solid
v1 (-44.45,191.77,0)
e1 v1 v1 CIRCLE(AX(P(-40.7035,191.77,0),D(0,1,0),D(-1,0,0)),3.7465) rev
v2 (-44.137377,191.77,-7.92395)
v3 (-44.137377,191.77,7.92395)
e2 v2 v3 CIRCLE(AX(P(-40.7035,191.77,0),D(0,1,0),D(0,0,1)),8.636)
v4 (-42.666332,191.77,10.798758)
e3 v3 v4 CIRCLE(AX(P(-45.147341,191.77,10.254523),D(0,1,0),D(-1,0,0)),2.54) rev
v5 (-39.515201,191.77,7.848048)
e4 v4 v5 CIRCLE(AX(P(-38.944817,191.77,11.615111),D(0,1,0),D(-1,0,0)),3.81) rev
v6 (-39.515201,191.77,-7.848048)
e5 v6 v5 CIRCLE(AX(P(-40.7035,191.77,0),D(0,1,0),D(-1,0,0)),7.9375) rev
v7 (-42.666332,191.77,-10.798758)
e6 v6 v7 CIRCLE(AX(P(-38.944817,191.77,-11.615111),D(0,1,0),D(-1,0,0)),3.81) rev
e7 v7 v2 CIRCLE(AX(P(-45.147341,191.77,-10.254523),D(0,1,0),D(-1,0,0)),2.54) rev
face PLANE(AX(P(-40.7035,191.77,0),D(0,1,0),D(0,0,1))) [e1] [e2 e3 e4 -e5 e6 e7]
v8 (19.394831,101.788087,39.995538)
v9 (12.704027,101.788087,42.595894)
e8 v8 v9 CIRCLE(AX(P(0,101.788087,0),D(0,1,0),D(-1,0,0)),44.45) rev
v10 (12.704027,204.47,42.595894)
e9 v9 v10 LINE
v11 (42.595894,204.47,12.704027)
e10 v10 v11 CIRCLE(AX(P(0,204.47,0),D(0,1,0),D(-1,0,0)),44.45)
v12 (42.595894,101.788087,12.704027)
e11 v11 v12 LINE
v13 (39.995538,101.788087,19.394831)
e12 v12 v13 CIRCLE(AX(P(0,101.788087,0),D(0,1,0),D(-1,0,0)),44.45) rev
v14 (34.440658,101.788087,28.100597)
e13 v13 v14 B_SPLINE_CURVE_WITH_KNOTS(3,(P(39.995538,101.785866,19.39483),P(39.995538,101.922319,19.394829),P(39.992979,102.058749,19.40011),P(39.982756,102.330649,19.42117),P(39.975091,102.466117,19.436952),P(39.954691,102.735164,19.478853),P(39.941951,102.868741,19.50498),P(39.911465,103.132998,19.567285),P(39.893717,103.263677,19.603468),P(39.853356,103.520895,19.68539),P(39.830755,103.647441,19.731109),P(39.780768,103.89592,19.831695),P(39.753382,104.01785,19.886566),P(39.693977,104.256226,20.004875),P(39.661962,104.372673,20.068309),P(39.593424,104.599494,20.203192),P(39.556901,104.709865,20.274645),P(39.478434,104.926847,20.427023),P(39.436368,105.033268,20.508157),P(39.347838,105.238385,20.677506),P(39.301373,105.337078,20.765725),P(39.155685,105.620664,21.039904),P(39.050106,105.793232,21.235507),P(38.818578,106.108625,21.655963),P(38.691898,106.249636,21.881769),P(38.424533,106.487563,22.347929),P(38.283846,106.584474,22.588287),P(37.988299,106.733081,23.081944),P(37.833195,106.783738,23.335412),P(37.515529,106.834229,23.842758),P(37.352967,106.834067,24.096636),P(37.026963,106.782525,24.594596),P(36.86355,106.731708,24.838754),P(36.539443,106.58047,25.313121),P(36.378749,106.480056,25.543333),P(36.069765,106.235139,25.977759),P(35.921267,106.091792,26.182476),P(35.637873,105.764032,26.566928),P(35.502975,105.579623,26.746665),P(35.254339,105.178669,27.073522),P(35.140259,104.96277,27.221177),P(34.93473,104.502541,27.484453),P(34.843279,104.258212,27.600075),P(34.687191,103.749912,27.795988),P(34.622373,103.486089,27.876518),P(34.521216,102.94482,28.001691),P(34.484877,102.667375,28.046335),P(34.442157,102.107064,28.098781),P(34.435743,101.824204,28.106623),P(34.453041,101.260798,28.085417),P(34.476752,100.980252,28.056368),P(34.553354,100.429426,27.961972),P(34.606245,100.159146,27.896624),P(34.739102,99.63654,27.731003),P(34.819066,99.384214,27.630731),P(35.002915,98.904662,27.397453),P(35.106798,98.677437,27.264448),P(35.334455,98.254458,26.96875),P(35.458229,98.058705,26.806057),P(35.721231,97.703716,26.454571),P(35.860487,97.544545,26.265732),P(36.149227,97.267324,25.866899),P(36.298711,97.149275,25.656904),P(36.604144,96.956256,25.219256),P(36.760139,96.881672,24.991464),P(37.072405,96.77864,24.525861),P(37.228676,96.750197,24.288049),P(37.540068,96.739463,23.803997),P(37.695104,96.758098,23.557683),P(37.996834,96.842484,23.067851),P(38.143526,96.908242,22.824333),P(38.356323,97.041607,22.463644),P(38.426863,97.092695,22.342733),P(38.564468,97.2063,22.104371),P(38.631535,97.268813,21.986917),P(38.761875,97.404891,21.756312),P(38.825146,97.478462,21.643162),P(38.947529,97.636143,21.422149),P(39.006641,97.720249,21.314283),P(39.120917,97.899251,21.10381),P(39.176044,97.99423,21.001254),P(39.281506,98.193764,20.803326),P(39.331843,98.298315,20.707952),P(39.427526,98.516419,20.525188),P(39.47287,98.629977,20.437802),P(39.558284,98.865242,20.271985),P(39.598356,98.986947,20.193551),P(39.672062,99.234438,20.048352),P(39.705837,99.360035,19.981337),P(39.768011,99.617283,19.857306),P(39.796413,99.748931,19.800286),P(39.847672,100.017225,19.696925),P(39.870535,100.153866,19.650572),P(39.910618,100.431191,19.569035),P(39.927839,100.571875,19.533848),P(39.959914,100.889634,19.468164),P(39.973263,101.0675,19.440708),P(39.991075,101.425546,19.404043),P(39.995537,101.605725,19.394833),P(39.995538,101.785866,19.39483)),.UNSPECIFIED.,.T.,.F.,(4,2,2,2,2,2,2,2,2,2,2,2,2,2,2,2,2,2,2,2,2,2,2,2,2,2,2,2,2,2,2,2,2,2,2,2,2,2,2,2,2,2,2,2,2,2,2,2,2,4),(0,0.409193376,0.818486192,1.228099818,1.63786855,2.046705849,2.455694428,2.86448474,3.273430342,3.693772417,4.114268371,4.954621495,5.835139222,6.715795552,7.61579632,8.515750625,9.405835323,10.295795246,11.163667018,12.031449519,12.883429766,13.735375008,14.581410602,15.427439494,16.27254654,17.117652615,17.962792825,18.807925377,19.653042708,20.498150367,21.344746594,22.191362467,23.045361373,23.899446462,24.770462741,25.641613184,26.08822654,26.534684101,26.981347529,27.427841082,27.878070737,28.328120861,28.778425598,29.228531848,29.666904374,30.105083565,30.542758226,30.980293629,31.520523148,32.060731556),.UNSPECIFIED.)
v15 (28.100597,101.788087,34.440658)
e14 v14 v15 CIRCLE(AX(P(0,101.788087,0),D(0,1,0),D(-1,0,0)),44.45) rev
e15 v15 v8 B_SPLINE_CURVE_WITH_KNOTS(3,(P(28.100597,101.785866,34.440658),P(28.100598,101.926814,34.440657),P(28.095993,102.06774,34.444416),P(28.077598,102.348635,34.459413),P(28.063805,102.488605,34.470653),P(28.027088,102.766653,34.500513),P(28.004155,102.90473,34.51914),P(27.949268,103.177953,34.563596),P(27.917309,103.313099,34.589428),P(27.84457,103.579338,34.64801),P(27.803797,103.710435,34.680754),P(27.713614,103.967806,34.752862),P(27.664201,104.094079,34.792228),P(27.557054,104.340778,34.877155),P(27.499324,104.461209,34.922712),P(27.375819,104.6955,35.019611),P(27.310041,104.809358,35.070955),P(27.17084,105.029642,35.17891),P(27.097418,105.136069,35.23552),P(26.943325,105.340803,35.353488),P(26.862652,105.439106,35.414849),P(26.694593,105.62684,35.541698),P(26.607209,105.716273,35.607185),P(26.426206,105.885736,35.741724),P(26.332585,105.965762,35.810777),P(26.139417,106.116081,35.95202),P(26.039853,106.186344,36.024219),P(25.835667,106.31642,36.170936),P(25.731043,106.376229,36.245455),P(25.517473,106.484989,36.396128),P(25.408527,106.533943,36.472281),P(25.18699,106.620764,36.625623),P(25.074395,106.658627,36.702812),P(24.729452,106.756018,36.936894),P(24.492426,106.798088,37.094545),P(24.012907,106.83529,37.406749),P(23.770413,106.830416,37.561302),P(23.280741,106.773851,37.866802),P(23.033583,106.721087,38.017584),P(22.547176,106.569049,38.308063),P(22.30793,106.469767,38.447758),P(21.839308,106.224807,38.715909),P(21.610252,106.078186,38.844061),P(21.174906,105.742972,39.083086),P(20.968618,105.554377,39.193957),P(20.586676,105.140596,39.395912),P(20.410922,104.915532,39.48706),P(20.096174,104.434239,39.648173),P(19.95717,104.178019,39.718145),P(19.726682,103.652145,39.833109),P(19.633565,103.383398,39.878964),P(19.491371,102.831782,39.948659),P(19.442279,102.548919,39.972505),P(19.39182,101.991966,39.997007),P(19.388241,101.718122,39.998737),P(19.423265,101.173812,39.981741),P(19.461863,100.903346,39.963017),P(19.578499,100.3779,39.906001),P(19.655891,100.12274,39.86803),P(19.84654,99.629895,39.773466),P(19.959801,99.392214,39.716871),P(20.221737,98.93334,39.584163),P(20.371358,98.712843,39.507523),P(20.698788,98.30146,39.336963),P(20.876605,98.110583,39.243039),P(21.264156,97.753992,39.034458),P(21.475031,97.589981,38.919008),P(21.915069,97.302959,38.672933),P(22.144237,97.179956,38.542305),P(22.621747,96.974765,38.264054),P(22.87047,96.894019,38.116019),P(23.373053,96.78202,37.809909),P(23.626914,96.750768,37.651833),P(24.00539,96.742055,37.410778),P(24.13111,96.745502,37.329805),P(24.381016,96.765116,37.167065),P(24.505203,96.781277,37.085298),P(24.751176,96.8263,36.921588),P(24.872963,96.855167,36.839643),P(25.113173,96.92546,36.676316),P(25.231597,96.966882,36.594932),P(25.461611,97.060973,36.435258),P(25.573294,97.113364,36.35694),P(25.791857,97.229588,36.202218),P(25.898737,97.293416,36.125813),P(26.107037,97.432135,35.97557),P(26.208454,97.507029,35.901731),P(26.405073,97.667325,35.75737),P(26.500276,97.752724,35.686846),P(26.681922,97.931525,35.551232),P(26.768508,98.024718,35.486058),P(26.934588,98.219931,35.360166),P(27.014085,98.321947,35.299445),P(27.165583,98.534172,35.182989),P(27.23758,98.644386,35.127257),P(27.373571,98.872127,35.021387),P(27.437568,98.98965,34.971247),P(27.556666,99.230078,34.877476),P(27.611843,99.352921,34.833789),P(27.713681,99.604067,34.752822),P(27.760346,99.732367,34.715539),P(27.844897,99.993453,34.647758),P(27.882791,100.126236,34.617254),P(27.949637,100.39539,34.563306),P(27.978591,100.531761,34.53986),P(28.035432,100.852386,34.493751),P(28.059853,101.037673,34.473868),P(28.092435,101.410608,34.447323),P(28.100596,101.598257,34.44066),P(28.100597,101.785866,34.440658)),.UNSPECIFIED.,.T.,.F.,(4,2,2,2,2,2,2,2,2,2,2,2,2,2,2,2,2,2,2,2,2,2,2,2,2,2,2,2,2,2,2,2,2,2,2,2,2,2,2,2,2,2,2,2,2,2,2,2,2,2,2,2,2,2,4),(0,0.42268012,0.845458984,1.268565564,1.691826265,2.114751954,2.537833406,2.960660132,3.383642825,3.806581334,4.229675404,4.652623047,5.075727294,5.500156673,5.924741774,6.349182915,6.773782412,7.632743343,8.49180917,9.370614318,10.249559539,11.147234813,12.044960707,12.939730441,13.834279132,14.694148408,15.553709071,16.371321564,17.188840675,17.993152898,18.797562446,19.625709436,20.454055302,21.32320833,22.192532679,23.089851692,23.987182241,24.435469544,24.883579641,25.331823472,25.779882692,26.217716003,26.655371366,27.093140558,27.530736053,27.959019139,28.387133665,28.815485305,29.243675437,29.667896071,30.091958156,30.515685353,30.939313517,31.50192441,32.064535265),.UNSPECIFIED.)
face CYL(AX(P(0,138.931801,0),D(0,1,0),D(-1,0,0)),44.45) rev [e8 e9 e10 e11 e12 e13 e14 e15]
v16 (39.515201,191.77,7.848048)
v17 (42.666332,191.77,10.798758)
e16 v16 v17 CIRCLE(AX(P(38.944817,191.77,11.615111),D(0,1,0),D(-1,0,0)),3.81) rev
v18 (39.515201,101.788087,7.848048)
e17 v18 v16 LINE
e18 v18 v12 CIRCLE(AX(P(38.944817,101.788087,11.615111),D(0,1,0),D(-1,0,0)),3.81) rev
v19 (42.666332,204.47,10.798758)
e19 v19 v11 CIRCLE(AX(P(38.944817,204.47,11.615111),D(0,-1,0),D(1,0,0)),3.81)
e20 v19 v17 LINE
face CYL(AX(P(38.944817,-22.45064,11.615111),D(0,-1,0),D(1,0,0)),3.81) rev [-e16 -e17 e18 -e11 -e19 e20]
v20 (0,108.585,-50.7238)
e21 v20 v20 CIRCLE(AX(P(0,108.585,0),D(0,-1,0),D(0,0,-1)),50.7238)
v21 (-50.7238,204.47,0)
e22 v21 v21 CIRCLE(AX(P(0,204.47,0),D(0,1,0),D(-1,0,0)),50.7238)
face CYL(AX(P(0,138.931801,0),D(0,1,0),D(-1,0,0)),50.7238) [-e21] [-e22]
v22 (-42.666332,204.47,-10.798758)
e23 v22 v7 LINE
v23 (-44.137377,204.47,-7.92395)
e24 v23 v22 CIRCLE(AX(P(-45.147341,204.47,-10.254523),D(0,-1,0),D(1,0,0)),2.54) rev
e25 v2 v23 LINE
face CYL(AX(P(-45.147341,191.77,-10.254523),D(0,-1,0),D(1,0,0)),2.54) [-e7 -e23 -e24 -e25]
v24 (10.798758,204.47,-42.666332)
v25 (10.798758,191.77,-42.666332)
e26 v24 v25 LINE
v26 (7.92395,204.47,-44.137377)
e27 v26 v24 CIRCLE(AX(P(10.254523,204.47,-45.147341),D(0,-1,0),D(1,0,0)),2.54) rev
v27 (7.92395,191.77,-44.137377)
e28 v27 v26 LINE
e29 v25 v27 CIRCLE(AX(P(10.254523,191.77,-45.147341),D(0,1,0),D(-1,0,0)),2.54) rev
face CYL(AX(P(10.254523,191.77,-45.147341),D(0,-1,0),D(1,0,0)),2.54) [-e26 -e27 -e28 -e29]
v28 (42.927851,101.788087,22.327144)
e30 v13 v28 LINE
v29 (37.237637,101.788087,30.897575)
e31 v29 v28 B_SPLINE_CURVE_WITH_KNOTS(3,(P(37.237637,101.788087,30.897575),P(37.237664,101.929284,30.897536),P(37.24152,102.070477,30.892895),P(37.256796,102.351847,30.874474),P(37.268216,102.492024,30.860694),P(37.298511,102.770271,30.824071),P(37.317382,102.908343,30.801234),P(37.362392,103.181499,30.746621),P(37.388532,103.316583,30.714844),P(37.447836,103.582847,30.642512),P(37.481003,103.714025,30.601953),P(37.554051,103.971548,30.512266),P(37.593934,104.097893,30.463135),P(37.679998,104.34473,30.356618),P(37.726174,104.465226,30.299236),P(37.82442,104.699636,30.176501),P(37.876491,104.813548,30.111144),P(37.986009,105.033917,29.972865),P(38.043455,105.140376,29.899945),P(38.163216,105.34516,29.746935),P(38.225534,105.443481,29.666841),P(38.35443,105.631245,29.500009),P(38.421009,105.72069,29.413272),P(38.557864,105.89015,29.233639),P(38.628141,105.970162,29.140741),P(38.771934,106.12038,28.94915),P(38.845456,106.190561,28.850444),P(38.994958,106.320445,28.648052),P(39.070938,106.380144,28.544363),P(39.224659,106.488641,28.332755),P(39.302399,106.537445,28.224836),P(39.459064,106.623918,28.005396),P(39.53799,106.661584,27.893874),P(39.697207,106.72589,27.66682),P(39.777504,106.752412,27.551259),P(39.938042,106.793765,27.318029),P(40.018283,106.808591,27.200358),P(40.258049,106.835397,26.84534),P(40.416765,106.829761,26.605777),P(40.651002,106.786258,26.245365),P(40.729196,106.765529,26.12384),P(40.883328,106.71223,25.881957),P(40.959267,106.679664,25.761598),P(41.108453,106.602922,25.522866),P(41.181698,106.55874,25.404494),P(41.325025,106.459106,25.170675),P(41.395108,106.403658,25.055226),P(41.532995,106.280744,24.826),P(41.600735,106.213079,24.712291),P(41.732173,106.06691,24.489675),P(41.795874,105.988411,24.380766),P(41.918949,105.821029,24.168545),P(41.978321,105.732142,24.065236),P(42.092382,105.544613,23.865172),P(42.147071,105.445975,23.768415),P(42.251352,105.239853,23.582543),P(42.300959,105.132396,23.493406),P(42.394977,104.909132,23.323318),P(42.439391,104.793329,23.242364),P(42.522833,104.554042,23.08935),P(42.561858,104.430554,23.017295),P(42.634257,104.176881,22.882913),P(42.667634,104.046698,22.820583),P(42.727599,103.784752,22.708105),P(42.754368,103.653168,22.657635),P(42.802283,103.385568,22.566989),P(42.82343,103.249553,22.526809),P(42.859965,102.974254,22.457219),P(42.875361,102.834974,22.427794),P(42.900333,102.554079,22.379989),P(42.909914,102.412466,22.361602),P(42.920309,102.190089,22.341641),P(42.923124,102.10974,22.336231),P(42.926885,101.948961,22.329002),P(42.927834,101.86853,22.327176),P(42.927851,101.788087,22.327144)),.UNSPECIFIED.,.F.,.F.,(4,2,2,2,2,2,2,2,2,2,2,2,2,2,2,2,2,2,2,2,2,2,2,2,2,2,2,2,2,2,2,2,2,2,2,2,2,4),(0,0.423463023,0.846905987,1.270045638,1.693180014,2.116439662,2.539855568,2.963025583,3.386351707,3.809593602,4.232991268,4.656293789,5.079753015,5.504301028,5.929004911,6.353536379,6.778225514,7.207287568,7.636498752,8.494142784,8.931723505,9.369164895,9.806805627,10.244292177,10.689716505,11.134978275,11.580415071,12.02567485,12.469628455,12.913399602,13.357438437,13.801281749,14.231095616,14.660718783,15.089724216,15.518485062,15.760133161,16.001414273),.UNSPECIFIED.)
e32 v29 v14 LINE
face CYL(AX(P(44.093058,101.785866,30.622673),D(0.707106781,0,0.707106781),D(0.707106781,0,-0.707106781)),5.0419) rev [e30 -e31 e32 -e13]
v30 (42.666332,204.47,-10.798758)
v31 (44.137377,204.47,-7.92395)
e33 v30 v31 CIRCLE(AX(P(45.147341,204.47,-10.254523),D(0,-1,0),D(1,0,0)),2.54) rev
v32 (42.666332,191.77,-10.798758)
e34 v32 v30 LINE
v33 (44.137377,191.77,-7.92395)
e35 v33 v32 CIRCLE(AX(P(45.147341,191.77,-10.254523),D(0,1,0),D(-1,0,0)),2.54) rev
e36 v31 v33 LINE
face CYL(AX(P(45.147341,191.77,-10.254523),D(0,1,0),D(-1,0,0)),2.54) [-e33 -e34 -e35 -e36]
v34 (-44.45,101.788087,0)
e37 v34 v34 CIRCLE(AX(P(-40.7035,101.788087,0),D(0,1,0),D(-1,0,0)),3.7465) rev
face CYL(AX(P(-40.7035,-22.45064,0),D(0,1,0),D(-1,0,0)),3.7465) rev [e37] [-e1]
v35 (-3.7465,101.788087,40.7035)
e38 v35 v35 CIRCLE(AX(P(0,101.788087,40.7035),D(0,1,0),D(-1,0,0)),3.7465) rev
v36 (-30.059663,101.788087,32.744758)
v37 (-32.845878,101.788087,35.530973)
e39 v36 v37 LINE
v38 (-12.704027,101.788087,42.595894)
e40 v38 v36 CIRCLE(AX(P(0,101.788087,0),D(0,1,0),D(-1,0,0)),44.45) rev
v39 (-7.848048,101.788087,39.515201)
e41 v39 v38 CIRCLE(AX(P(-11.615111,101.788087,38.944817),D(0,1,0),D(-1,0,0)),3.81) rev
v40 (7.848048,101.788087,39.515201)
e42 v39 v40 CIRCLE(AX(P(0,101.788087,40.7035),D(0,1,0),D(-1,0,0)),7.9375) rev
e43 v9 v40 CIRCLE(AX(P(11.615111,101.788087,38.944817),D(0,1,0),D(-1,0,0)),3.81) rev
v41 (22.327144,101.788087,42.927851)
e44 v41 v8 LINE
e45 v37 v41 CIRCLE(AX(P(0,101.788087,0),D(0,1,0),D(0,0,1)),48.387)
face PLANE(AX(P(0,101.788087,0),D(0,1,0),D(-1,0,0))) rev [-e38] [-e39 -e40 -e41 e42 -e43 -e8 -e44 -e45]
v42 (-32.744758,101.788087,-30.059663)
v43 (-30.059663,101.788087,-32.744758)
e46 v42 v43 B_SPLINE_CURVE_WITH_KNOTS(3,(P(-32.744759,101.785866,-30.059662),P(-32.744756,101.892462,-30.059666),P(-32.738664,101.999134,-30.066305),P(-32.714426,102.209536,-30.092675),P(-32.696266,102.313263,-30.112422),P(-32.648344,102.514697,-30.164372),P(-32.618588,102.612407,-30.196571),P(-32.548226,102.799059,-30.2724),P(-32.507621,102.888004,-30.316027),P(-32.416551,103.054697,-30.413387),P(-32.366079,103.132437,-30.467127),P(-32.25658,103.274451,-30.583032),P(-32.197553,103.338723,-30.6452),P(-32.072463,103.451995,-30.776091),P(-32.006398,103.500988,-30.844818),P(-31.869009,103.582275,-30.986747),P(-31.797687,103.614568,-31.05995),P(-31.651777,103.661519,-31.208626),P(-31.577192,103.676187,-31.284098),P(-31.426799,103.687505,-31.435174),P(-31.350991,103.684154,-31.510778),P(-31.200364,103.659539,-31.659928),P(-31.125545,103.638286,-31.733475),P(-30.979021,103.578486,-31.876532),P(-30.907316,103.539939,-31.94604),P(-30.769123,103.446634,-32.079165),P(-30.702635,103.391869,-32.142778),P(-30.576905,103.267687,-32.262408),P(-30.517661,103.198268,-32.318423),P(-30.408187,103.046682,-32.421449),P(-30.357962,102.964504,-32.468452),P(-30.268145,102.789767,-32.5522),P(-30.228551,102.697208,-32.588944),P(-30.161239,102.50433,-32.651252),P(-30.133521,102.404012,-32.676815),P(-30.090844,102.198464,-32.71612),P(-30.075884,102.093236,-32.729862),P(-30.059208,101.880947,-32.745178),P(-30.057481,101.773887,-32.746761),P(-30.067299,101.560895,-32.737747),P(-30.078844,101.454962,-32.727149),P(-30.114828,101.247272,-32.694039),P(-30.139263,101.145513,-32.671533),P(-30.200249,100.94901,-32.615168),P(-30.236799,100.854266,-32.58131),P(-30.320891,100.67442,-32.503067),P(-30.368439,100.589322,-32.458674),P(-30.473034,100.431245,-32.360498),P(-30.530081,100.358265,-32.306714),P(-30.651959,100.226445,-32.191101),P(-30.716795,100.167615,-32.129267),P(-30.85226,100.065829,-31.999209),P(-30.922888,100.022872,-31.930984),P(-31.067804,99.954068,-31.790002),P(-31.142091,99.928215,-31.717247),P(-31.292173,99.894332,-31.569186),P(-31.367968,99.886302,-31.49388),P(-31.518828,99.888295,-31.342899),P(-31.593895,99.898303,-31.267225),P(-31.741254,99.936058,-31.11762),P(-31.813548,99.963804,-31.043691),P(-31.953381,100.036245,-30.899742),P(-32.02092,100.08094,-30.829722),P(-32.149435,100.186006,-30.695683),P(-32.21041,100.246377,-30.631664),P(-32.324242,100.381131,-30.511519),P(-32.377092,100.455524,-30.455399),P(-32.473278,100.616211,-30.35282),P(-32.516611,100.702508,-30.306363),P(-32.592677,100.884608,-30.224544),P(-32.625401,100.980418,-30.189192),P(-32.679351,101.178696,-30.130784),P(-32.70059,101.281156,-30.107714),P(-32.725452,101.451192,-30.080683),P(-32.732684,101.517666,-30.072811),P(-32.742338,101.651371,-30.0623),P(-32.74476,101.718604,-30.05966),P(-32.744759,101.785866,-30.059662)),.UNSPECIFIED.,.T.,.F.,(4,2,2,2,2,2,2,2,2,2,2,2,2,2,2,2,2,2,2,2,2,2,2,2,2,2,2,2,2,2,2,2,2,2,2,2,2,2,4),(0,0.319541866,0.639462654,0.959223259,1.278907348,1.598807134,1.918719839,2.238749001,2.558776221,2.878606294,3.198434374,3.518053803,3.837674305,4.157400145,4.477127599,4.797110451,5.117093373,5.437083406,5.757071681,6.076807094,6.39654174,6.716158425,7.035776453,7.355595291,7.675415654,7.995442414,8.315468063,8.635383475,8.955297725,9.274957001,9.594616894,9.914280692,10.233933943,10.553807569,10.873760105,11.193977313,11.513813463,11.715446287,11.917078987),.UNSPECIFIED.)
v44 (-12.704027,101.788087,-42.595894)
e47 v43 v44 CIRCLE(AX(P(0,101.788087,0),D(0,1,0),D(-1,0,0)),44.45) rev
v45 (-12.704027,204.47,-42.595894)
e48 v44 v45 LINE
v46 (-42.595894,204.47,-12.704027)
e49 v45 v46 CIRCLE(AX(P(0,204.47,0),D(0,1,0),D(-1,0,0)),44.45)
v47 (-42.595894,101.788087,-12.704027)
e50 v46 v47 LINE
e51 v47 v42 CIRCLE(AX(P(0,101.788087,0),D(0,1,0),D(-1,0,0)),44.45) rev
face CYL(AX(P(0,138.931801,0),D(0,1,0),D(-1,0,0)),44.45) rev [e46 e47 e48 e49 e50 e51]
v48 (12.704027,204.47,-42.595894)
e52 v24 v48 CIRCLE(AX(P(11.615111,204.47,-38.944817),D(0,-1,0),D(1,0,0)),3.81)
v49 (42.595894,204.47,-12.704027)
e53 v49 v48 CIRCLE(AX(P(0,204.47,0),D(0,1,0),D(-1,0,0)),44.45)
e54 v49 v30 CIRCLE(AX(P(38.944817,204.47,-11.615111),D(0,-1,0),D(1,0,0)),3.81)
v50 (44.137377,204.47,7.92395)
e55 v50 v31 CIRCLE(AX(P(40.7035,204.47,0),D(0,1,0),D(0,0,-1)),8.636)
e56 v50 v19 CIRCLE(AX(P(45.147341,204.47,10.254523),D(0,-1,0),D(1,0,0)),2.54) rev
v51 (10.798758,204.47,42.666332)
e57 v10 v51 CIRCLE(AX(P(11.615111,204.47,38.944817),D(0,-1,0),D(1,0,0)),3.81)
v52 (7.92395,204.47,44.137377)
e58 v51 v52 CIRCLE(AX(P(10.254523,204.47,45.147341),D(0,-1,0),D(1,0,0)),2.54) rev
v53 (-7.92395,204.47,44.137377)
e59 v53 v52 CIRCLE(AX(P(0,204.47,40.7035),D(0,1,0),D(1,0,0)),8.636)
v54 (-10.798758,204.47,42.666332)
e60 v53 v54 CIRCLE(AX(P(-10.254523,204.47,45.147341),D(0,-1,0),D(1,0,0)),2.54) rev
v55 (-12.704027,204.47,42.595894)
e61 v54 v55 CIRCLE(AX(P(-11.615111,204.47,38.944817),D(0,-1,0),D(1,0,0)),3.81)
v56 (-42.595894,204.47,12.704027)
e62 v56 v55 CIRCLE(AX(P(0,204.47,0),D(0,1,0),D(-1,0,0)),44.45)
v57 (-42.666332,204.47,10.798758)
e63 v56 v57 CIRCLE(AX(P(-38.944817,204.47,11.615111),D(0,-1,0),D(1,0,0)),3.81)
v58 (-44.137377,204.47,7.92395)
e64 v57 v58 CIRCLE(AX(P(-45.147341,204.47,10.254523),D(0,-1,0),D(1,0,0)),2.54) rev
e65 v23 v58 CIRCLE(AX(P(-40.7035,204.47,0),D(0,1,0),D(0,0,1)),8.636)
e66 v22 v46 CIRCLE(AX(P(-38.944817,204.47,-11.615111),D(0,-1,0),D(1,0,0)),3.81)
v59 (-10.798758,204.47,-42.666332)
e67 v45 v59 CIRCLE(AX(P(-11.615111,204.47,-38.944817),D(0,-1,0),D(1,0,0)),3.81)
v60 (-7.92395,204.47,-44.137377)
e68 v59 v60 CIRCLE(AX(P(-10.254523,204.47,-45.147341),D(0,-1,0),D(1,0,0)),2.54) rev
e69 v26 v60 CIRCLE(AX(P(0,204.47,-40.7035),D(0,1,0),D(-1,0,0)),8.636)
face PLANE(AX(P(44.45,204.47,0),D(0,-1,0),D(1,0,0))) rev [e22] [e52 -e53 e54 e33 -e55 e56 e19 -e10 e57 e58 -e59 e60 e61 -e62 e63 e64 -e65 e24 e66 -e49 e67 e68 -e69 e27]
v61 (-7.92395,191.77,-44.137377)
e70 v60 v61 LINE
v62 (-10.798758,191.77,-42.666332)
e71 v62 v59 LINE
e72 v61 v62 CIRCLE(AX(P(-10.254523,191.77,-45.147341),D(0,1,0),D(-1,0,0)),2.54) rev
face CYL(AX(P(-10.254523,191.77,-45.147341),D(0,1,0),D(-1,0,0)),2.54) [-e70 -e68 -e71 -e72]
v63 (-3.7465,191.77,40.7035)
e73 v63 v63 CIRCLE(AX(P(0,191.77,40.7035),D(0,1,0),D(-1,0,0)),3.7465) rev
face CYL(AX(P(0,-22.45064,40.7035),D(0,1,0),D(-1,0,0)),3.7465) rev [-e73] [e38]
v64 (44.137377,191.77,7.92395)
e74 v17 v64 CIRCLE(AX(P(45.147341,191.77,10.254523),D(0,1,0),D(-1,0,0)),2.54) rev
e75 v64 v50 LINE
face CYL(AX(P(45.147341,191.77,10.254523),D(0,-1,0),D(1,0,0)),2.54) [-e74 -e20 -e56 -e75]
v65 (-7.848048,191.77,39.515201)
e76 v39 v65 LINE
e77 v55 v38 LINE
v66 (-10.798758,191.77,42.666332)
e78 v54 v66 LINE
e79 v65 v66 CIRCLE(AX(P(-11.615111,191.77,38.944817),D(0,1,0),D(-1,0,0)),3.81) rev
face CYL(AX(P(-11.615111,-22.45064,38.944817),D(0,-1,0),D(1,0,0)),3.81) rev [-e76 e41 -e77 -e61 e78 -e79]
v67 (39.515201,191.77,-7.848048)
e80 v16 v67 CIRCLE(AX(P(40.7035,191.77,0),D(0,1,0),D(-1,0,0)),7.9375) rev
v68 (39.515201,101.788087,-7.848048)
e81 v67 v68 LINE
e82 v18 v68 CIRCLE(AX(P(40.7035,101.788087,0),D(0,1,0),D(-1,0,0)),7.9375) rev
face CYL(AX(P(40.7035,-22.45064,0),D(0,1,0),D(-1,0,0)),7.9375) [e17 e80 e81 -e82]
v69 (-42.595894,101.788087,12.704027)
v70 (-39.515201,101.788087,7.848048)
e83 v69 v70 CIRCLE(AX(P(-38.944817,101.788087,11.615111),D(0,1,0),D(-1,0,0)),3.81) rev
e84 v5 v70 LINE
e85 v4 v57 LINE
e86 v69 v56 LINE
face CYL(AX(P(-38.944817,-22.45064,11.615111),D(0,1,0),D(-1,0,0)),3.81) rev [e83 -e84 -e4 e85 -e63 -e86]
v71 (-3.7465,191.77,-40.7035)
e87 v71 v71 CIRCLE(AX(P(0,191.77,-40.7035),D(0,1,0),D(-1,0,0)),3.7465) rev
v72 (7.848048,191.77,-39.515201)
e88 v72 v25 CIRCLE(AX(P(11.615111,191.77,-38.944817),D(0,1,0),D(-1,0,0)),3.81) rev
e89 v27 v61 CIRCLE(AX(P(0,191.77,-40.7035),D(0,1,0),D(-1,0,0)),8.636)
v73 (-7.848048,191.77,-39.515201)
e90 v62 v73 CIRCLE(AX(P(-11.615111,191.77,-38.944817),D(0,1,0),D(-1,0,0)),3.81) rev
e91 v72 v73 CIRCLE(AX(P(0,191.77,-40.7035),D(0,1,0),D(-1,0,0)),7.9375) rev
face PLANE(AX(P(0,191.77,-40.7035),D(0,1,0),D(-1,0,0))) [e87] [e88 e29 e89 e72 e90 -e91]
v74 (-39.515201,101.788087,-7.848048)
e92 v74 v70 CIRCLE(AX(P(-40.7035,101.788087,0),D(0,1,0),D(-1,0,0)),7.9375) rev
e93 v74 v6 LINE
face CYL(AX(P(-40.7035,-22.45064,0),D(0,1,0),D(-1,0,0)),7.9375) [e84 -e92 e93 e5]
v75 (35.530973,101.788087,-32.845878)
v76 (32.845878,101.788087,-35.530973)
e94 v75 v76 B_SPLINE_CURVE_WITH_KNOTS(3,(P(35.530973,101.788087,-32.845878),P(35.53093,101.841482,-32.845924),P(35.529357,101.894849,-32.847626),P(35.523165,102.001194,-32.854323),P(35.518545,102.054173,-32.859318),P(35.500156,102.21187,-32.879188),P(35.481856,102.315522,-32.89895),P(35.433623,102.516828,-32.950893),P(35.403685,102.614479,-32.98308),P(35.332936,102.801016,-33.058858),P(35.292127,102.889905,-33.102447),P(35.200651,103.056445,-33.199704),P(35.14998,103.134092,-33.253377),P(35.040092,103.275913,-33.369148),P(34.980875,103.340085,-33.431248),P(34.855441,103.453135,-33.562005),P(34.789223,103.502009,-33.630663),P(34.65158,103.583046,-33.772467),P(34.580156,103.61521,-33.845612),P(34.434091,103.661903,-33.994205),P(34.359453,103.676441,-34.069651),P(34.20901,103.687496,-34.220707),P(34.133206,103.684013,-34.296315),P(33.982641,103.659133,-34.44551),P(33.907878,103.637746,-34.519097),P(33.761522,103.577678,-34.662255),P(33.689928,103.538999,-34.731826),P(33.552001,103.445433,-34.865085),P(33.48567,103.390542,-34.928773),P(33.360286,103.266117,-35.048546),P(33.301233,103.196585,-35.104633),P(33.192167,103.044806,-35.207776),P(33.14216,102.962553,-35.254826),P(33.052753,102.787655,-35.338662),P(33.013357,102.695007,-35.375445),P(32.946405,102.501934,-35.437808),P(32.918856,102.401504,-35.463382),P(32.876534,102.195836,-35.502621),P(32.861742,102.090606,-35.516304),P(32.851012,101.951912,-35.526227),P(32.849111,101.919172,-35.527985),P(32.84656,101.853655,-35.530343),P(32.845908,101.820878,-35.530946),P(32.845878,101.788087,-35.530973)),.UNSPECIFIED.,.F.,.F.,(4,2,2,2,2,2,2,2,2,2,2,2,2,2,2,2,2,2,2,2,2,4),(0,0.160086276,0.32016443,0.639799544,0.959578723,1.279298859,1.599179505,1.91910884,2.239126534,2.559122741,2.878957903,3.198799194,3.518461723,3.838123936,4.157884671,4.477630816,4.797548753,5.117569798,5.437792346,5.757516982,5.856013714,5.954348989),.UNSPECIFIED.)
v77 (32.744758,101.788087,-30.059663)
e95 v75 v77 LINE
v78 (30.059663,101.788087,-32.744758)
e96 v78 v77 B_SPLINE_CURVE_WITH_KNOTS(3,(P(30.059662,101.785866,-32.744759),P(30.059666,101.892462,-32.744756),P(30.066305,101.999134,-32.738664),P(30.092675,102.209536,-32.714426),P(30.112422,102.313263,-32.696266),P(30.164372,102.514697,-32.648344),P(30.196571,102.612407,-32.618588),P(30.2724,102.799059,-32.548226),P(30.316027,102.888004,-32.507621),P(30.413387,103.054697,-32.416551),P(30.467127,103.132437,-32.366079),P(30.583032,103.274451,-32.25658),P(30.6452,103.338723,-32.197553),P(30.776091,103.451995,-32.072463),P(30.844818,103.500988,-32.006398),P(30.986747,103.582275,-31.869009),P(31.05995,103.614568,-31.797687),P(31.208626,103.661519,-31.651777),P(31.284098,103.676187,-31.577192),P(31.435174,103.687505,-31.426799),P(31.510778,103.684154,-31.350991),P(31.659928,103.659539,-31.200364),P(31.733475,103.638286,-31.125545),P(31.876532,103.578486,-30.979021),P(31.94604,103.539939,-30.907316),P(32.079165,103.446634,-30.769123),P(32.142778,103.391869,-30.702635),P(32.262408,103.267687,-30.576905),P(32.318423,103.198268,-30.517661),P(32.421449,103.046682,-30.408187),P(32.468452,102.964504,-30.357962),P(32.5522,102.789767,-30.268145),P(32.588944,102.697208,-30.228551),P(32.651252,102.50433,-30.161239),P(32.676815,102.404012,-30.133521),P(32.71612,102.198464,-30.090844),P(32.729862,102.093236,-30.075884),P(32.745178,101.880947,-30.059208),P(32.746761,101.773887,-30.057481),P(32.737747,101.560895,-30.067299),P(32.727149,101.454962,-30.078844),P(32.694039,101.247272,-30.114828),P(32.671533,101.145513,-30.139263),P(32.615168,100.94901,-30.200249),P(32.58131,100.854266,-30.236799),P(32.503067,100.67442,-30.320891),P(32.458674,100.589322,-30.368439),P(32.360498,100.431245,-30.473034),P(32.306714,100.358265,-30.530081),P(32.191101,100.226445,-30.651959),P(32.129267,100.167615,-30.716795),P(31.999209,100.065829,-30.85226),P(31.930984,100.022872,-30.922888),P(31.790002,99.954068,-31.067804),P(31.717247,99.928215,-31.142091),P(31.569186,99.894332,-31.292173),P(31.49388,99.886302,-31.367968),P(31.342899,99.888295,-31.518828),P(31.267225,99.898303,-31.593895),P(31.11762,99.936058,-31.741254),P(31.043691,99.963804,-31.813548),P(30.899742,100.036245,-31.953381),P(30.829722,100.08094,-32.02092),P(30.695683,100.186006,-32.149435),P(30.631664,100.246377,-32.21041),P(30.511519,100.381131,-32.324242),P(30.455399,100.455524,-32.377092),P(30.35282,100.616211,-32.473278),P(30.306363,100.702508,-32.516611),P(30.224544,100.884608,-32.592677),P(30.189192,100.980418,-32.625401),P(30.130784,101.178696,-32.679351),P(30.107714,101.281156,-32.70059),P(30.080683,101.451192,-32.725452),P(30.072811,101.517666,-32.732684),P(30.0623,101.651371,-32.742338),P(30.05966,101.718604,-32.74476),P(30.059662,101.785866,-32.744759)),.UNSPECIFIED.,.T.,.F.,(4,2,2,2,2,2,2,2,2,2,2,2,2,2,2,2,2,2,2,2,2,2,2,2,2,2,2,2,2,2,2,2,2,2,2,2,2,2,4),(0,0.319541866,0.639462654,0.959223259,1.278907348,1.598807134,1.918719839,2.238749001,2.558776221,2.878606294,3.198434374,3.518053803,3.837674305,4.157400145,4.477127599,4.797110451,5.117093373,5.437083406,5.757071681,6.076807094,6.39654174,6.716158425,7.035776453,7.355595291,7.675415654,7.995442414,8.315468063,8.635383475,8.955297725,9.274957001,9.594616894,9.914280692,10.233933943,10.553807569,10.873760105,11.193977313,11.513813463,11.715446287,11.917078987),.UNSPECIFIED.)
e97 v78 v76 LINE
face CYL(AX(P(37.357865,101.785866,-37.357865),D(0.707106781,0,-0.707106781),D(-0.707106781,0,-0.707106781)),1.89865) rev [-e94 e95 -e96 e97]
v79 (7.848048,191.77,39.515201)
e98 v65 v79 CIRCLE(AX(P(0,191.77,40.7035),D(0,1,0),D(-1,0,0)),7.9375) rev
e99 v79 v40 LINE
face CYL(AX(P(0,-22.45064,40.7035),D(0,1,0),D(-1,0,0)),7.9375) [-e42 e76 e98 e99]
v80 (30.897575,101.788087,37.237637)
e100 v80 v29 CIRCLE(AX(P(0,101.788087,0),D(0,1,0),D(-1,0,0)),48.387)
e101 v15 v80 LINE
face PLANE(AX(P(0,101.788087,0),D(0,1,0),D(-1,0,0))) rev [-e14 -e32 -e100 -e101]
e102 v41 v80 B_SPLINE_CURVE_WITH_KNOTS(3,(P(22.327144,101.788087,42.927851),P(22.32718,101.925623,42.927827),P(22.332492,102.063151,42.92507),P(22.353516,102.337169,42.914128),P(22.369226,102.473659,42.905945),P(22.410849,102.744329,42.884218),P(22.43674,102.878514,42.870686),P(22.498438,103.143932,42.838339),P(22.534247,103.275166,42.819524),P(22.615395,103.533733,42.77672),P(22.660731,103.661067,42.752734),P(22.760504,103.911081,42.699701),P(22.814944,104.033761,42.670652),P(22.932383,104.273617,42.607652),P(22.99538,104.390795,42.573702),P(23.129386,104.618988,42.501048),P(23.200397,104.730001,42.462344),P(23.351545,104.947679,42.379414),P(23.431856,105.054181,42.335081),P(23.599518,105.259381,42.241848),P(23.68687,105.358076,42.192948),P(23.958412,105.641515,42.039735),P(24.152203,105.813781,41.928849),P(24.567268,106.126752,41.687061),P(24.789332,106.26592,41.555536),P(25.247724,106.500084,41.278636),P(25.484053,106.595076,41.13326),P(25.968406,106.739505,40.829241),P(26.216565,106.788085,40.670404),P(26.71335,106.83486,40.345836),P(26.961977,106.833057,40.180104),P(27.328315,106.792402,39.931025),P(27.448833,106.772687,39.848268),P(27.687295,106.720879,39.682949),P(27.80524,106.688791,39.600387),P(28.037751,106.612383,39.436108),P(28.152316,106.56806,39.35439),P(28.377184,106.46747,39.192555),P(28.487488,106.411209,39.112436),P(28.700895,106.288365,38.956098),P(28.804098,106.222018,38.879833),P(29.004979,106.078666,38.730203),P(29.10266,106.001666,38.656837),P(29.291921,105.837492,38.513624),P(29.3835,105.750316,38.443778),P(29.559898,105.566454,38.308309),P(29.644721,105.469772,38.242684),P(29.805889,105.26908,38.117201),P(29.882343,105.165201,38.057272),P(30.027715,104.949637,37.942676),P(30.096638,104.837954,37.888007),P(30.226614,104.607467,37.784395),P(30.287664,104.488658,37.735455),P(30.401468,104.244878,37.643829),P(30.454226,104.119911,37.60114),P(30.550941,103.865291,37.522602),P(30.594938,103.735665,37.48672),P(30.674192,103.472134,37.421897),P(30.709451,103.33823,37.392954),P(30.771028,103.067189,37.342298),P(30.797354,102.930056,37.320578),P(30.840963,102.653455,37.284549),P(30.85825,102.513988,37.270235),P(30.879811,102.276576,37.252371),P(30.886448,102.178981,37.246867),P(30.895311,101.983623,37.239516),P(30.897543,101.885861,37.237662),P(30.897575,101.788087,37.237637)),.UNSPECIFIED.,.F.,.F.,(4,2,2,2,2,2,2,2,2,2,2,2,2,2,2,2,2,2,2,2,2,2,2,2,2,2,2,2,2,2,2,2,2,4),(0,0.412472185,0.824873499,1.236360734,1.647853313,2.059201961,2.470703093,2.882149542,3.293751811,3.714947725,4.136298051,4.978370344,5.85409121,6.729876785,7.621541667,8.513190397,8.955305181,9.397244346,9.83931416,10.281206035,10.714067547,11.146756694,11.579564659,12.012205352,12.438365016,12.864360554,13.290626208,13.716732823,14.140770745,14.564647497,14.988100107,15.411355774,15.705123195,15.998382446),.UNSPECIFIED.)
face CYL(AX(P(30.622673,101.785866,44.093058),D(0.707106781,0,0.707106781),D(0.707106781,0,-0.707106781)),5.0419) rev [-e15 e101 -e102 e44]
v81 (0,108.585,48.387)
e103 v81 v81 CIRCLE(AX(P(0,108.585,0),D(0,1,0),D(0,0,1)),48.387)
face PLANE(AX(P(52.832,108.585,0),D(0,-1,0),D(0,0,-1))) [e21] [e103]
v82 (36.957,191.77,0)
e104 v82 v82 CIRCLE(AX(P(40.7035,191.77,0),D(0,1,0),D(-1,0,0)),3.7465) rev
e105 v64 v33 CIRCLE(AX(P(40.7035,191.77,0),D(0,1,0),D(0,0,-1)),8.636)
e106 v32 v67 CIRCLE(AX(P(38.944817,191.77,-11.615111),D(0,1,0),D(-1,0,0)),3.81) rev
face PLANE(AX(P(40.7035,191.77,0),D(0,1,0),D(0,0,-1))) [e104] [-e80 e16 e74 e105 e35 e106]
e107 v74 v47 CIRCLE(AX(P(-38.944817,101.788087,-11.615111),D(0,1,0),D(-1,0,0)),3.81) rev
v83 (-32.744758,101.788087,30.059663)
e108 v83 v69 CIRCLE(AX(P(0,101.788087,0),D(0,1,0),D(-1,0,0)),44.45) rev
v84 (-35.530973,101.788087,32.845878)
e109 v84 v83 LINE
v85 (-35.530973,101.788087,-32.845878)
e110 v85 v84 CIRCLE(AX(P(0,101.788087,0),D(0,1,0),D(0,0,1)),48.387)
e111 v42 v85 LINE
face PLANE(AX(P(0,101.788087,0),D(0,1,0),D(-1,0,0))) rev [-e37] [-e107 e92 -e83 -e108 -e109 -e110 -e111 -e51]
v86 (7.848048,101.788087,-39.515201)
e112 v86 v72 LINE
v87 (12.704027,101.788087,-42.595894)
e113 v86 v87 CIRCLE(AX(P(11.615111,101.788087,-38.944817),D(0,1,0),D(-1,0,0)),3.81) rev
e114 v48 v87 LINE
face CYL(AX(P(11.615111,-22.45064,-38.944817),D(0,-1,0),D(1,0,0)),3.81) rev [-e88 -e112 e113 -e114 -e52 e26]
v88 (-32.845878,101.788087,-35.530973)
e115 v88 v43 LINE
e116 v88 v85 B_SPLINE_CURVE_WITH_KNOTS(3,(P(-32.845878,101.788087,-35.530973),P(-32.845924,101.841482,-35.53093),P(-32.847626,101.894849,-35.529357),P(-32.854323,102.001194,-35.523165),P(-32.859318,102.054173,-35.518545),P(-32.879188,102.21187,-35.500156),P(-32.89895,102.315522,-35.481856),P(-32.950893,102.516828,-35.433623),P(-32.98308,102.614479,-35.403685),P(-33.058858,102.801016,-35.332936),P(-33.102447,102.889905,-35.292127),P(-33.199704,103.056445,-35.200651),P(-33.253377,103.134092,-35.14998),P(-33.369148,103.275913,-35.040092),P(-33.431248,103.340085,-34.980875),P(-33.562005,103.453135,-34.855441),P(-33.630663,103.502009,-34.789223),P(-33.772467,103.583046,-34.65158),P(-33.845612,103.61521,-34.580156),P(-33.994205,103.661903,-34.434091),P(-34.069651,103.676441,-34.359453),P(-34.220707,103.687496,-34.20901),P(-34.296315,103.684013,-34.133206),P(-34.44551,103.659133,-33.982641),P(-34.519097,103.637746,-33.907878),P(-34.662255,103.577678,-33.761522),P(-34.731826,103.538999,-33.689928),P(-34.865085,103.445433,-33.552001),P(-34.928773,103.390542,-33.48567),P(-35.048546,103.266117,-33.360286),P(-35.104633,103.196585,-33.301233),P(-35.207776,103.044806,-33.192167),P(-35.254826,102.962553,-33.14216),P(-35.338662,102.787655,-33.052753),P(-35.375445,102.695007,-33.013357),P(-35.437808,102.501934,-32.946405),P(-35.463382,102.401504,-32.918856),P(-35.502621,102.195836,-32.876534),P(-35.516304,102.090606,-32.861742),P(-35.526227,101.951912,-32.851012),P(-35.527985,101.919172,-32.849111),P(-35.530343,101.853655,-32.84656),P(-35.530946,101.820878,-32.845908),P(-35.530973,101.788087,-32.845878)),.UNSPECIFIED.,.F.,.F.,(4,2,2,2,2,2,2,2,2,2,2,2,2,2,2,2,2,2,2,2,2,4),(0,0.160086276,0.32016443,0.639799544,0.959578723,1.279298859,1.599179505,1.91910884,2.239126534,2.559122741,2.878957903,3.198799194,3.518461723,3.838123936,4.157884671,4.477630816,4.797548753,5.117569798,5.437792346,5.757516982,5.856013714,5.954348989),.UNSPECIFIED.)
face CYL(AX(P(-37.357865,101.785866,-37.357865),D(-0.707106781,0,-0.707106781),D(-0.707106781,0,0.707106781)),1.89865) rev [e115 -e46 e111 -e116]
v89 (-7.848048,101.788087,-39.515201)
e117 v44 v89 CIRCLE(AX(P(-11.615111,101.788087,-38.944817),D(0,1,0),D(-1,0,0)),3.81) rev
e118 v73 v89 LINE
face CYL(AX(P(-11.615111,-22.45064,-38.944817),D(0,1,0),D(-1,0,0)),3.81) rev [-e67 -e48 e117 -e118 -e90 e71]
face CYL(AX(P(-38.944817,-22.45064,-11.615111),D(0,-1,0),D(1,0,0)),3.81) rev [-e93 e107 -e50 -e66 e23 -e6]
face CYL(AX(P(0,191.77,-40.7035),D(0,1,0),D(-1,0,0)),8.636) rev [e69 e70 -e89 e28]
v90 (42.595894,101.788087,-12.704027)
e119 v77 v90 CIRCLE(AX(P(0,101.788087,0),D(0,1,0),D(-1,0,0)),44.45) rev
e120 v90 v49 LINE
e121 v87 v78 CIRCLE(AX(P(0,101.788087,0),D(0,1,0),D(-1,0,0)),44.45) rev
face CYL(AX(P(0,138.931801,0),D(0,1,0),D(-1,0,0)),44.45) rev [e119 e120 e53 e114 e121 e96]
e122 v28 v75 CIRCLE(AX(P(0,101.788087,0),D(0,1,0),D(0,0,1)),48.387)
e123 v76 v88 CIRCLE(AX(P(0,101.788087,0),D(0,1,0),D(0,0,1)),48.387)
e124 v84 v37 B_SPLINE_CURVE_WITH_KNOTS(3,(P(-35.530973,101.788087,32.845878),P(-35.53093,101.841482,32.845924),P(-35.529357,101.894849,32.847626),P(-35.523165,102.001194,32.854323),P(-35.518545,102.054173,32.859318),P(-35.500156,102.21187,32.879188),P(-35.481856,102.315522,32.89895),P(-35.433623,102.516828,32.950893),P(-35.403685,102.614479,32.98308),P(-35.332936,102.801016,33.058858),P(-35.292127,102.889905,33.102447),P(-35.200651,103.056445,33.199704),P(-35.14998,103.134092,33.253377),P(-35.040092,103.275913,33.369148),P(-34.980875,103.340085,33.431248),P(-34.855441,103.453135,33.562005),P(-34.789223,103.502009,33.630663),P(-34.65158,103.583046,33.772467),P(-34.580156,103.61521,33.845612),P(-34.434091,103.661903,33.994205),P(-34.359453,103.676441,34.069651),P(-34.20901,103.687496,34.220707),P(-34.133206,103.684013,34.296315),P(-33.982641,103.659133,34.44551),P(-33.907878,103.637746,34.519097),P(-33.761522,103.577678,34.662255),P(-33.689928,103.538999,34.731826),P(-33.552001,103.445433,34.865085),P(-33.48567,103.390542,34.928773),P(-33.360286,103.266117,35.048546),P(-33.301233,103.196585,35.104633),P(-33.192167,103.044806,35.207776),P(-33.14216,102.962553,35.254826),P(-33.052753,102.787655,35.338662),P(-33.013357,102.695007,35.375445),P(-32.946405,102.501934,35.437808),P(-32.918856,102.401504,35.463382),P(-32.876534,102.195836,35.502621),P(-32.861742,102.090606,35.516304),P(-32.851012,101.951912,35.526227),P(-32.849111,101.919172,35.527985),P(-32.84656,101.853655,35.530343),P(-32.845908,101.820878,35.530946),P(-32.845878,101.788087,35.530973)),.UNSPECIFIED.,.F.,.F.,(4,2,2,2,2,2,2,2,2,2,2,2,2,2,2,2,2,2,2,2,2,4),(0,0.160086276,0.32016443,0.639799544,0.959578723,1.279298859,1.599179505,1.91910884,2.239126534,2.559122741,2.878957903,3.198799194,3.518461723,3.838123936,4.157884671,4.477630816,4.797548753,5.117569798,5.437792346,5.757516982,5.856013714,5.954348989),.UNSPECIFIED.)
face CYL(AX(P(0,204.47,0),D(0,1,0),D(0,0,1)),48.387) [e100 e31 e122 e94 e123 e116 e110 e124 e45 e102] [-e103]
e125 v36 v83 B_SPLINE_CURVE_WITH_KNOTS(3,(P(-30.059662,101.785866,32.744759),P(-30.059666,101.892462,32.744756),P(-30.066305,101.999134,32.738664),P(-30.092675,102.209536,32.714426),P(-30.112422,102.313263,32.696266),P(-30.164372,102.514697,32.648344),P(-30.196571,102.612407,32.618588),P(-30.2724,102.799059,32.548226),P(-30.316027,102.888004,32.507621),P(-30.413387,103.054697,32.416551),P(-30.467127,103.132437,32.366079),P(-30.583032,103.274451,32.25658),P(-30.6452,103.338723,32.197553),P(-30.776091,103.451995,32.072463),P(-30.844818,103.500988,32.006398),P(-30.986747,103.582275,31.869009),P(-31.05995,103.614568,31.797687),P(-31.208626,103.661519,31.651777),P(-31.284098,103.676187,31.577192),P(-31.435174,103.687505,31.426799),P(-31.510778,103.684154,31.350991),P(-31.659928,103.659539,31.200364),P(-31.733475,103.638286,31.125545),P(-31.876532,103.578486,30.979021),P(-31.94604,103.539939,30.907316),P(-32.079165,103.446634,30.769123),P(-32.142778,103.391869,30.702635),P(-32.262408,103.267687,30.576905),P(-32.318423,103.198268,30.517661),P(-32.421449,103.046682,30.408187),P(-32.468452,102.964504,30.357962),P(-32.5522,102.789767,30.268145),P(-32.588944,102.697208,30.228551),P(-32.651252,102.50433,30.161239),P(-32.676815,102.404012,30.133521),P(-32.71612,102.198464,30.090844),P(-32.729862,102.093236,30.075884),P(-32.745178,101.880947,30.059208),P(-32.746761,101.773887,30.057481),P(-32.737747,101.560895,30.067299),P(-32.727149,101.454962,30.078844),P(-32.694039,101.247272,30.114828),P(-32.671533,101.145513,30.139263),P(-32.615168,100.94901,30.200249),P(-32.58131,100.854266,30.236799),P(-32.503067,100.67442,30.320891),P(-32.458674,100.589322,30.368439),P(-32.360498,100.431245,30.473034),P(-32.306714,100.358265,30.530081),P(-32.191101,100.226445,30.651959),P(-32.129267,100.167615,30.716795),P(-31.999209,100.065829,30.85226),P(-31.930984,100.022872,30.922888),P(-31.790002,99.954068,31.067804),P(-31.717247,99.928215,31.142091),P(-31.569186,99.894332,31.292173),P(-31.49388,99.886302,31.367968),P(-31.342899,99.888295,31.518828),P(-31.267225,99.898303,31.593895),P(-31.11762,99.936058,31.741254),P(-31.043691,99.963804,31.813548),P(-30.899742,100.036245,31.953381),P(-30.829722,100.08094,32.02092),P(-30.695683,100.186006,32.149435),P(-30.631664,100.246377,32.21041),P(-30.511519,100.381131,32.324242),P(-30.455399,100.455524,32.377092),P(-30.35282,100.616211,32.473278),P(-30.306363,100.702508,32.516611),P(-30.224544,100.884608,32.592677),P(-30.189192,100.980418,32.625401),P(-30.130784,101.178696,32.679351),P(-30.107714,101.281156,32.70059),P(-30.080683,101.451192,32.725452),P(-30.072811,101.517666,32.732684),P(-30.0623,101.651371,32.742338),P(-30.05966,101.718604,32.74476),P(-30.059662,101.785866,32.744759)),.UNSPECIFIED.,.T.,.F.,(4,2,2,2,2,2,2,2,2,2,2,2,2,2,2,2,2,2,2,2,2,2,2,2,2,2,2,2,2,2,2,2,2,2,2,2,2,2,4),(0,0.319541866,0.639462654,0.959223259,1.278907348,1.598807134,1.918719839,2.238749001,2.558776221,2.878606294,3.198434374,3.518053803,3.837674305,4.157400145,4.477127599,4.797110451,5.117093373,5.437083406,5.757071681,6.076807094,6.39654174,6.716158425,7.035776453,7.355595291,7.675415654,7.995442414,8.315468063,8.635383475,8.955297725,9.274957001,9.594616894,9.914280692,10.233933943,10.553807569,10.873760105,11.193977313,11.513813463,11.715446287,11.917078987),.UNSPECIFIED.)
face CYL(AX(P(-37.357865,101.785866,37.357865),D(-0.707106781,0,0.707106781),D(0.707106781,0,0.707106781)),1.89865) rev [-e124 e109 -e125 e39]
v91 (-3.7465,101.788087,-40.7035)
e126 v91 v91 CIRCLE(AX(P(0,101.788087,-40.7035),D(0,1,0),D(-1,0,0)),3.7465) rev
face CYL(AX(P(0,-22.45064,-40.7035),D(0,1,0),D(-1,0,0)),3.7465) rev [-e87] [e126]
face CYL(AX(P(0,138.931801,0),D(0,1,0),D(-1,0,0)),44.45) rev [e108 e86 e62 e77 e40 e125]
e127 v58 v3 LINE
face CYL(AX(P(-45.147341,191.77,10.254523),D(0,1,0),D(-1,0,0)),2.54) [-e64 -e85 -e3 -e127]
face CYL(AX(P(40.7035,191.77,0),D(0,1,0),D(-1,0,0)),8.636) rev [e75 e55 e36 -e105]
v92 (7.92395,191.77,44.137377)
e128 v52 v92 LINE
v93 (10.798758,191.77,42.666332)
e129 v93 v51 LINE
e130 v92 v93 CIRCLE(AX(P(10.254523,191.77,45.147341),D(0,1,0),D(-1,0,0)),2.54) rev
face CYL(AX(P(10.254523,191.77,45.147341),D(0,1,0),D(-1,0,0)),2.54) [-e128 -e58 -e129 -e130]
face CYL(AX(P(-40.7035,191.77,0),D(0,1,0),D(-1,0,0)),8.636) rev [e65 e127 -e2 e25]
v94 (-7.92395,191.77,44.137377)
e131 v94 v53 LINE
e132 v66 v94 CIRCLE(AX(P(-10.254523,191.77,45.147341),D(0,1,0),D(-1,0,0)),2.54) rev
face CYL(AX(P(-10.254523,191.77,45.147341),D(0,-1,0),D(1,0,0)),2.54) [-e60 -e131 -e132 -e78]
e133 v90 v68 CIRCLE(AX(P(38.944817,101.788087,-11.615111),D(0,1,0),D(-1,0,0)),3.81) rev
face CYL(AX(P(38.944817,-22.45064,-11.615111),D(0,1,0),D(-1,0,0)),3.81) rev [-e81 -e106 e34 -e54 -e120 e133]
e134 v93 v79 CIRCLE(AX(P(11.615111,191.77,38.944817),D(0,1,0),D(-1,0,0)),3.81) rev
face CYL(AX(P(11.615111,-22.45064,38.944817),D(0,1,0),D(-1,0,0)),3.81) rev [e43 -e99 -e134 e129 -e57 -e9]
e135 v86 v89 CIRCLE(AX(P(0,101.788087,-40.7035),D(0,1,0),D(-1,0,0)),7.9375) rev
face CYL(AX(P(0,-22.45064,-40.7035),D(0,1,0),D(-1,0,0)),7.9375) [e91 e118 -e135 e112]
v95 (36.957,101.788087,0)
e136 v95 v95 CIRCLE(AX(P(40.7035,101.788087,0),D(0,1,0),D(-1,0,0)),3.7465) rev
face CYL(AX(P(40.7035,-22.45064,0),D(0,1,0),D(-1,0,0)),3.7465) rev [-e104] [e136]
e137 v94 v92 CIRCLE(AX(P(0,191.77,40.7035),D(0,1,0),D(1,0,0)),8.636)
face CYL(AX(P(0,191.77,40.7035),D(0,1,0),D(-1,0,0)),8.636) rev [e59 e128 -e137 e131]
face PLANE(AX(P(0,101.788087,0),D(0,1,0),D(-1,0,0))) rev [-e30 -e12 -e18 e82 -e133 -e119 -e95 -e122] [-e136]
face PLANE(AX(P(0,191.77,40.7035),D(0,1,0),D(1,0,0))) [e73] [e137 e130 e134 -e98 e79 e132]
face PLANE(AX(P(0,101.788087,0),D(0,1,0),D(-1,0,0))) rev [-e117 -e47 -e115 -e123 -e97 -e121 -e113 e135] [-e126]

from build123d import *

# Parameters (mm, degrees)
SKETCH2_R                   = 7.9375
SKETCH2_R_2                 = 3.7465
BOSS_EXTRUDE1_DEPTH         = 204.47
FILLET1_R                   = 3.81
CIRPATTERN1_COUNT           = 4
FILLET1_OF_CIRPATTERN1_R    = 3.81
SKETCH3_R                   = 8.636
CUT_EXTRUDE1_DEPTH          = 12.7
CIRPATTERN2_COUNT           = 4
FILLET2_R                   = 2.54
MIRROR1_COPY_1_SKETCH_R     = 8.636
MIRROR1_COPY_1_DEPTH        = 12.7
MIRROR1_COPY_2_SKETCH_R     = 8.636
MIRROR1_COPY_2_DEPTH        = 12.7
MIRROR1_COPY_3_SKETCH_R     = 8.636
MIRROR1_COPY_3_DEPTH        = 12.7
FILLET3_R                   = 2.54
CHAMFER1_SIZE               = 1.27
CHAMFER1_SIZE_2             = 7.202527911
F_3_8_CLEARANCE_HOLE1_D     = 10.0838
F_3_8_CLEARANCE_HOLE1_DEPTH = 54.864
F_3_8_CLEARANCE_HOLE1_TIP   = 3.029479155
CIRPATTERN3_COUNT           = 3
CIRPATTERN3_ANGLE           = 180
CUT_EXTRUDE2_START          = -204.47
SKETCH9_R                   = 52.832
CUT_EXTRUDE2_DEPTH          = 101.788087
SKETCH10_W                  = 4.445
SKETCH10_H                  = 6.796913


with BuildPart() as part:
    # Sketch1 → Revolve1 (revolve)
    with BuildSketch(Plane.XY, mode=Mode.PRIVATE) as revolve1_sk:
        Polygon((44.45, 0), (44.45, 204.47), (50.7238, 204.47), (50.7238, 108.585), (52.832, 108.585), (52.832, 95.885), (50.7238, 95.885), (50.7238, 0), align=None)
    revolve(revolve1_sk.sketch.rotate(Axis((0, 138.931800571, 0), (0, -1, 0)), 180), axis=Axis((0, 138.931800571, 0), (0, -1, 0)))

    # Sketch2 → Boss-Extrude1 (add)
    with BuildSketch(Plane(origin=(0, 204.47, 0), x_dir=(1, 0, 0), z_dir=(0, 1, 0))):
        with Locations((0, 40.7035)):
            Circle(SKETCH2_R)
        with Locations(Location((0, 40.7035, 0), (0, 0, 180))):
            Circle(SKETCH2_R_2, mode=Mode.SUBTRACT)
    boss_extrude1 = extrude(amount=-BOSS_EXTRUDE1_DEPTH)

    # Fillet1
    fillet1_edges = [part.edges().sort_by_distance(p)[0] for p in [
        (-7.287865551, 102.235, -43.848483619),
        (7.287865551, 102.235, -43.848483619),
    ]]
    fillet(fillet1_edges, radius=FILLET1_R)

    # CirPattern1: Boss-Extrude1 ×4 about axis
    cirpattern1_axis = Axis((0, 0, 0), (0, 1, 0))
    for i in range(1, CIRPATTERN1_COUNT):
        add(boss_extrude1.rotate(cirpattern1_axis, i * 360 / CIRPATTERN1_COUNT))

    # Fillet1 of CirPattern1
    fillet1_of_cirpattern1_edges = [part.edges().sort_by_distance(p)[0] for p in [
        (-43.848483619, 102.235, 7.287865551),
        (-43.848483619, 102.235, -7.287865551),
        (7.287865551, 102.235, 43.848483619),
        (-7.287865551, 102.235, 43.848483619),
        (43.848483619, 102.235, -7.287865551),
        (43.848483619, 102.235, 7.287865551),
    ]]
    fillet(fillet1_of_cirpattern1_edges, radius=FILLET1_OF_CIRPATTERN1_R)

    # Sketch3 → Cut-Extrude1 (cut)
    with BuildSketch(Plane(origin=(0, 204.47, 0), x_dir=(1, 0, 0), z_dir=(0, 1, 0))):
        with Locations((0, 40.7035)):
            Circle(SKETCH3_R)
    cut_extrude1 = extrude(amount=-CUT_EXTRUDE1_DEPTH, mode=Mode.SUBTRACT)

    # CirPattern2: Cut-Extrude1 ×4 about axis
    cirpattern2_axis = Axis((0, 0, 0), (0, 1, 0))
    for i in range(1, CIRPATTERN2_COUNT):
        add(cut_extrude1.rotate(cirpattern2_axis, i * 360 / CIRPATTERN2_COUNT), mode=Mode.SUBTRACT)

    # Fillet2
    fillet2_edges = [part.edges().sort_by_distance(p)[0] for p in [
        (-8.61576795, 198.12, -41.294294914),
        (8.61576795, 198.12, -41.294294914),
        (-41.294294914, 198.12, 8.61576795),
        (8.61576795, 198.12, 41.294294914),
        (41.294294914, 198.12, -8.61576795),
        (41.294294914, 198.12, 8.61576795),
        (-8.61576795, 198.12, 41.294294914),
        (-41.294294914, 198.12, -8.61576795),
    ]]
    fillet(fillet2_edges, radius=FILLET2_R)

    # Mirror1: Cut-Extrude1 across plane
    add(cut_extrude1.mirror(Plane.ZX.offset(102.235)), mode=Mode.SUBTRACT)

    # Mirror1 copy 1 sketch → Mirror1 copy 1 (cut)
    with BuildSketch(Plane(origin=(0, 0, 0), x_dir=(0, 0, -1), z_dir=(0, -1, 0))):
        with Locations((0, -40.7035)):
            Circle(MIRROR1_COPY_1_SKETCH_R)
    extrude(amount=-MIRROR1_COPY_1_DEPTH, mode=Mode.SUBTRACT)

    # Mirror1 copy 2 sketch → Mirror1 copy 2 (cut)
    with BuildSketch(Plane(origin=(0, 0, 0), x_dir=(-1, 0, 0), z_dir=(0, -1, 0))):
        with Locations((0, -40.7035)):
            Circle(MIRROR1_COPY_2_SKETCH_R)
    extrude(amount=-MIRROR1_COPY_2_DEPTH, mode=Mode.SUBTRACT)

    # Mirror1 copy 3 sketch → Mirror1 copy 3 (cut)
    with BuildSketch(Plane(origin=(0, 0, 0), x_dir=(0, 0, 1), z_dir=(0, -1, 0))):
        with Locations((0, -40.7035)):
            Circle(MIRROR1_COPY_3_SKETCH_R)
    extrude(amount=-MIRROR1_COPY_3_DEPTH, mode=Mode.SUBTRACT)

    # Fillet3
    fillet3_edges = [part.edges().sort_by_distance(p)[0] for p in [
        (-41.294294914, 6.35, 8.61576795),
        (8.61576795, 6.35, 41.294294914),
        (41.294294914, 6.35, -8.61576795),
        (-8.61576795, 6.35, -41.294294914),
        (8.61576795, 6.35, -41.294294914),
        (41.294294914, 6.35, 8.61576795),
        (-8.61576795, 6.35, 41.294294914),
        (-41.294294914, 6.35, -8.61576795),
    ]]
    fillet(fillet3_edges, radius=FILLET3_R)

    # Chamfer1
    # the kernel refuses this chamfer: 7.202527911, 1.27 mm, written as the material it adds along each edge
    with BuildSketch(Plane(origin=(0, 95.885, 0), x_dir=(-1, 0, 0), z_dir=(0, 0, 1))) as chamfer1_piece_1_section:
        Polygon((50.7238, CHAMFER1_SIZE), (50.7238 + CHAMFER1_SIZE_2, 0), (50.7238, 0), align=None)
    chamfer1_piece_1 = revolve(axis=Axis((0, 95.885, 0), (0, -1, 0)), mode=Mode.PRIVATE)
    chamfer1_piece_1 = chamfer1_piece_1 & Plane(origin=(0, 94.871613174, 0), x_dir=(-1, 0, 0), z_dir=(0, -1, 0)) * Cylinder(52.832, 232, mode=Mode.PRIVATE)
    add(chamfer1_piece_1)

    # 3/8 Clearance Hole1
    with Locations(Plane(origin=(37.357865464, 0, 37.357865464), x_dir=(0, 1, 0), z_dir=(0.7071067811865488, 0, 0.7071067811865464))):
        with Locations((101.78586627, -9.525), (101.78586627, 9.525)):
            Hole(F_3_8_CLEARANCE_HOLE1_D / 2, depth=F_3_8_CLEARANCE_HOLE1_DEPTH)
            with Locations((0, 0, -(F_3_8_CLEARANCE_HOLE1_DEPTH + F_3_8_CLEARANCE_HOLE1_TIP / 2))):  # 118° drill point
                Cone(0, F_3_8_CLEARANCE_HOLE1_D / 2, F_3_8_CLEARANCE_HOLE1_TIP, mode=Mode.SUBTRACT)

    # Sketch8 → #6 Clearance Hole1 (revolve, cut)
    with BuildSketch(Plane(origin=(37.357865464, 101.78586627, -37.357865464), x_dir=(-0.7071067811865512, 0, -0.7071067811865438), z_dir=(0, 1, 0))):
        Polygon((0, 0), (0, 56.004824014), (1.89865, 54.864), (1.89865, 0), align=None)
    f_6_clearance_hole1 = revolve(axis=Axis((41.847993524, 101.78586627, -41.847993524), (-0.7071067811865438, 0, 0.7071067811865512)), mode=Mode.SUBTRACT)

    # CirPattern3: #6 Clearance Hole1 ×3 about axis
    cirpattern3_axis = Axis((0, 138.931800571, 0), (0, 1, 0))
    for i in range(1, CIRPATTERN3_COUNT):
        add(f_6_clearance_hole1.rotate(cirpattern3_axis, i * CIRPATTERN3_ANGLE / (CIRPATTERN3_COUNT - 1)), mode=Mode.SUBTRACT)

    # Sketch9 → Cut-Extrude2 (cut)
    with BuildSketch(Plane(origin=(0, 204.47, 0), x_dir=(1, 0, 0), z_dir=(0, 1, 0)).offset(CUT_EXTRUDE2_START)):
        with Locations(Location((0, 0, 0), (0, 0, 180))):
            Circle(SKETCH9_R)
    extrude(amount=CUT_EXTRUDE2_DEPTH, mode=Mode.SUBTRACT)

    # Sketch10 → Cut-Revolve1 (revolve, cut)
    with BuildSketch(Plane.XY, mode=Mode.PRIVATE) as cut_revolve1_sk:
        with Locations((50.6095, 105.1865435)):
            Rectangle(SKETCH10_W, SKETCH10_H)
    revolve(cut_revolve1_sk.sketch.rotate(Axis((0, 204.47, 0), (0, -1, 0)), 90), axis=Axis((0, 204.47, 0), (0, -1, 0)), mode=Mode.SUBTRACT)


solid = part.part
